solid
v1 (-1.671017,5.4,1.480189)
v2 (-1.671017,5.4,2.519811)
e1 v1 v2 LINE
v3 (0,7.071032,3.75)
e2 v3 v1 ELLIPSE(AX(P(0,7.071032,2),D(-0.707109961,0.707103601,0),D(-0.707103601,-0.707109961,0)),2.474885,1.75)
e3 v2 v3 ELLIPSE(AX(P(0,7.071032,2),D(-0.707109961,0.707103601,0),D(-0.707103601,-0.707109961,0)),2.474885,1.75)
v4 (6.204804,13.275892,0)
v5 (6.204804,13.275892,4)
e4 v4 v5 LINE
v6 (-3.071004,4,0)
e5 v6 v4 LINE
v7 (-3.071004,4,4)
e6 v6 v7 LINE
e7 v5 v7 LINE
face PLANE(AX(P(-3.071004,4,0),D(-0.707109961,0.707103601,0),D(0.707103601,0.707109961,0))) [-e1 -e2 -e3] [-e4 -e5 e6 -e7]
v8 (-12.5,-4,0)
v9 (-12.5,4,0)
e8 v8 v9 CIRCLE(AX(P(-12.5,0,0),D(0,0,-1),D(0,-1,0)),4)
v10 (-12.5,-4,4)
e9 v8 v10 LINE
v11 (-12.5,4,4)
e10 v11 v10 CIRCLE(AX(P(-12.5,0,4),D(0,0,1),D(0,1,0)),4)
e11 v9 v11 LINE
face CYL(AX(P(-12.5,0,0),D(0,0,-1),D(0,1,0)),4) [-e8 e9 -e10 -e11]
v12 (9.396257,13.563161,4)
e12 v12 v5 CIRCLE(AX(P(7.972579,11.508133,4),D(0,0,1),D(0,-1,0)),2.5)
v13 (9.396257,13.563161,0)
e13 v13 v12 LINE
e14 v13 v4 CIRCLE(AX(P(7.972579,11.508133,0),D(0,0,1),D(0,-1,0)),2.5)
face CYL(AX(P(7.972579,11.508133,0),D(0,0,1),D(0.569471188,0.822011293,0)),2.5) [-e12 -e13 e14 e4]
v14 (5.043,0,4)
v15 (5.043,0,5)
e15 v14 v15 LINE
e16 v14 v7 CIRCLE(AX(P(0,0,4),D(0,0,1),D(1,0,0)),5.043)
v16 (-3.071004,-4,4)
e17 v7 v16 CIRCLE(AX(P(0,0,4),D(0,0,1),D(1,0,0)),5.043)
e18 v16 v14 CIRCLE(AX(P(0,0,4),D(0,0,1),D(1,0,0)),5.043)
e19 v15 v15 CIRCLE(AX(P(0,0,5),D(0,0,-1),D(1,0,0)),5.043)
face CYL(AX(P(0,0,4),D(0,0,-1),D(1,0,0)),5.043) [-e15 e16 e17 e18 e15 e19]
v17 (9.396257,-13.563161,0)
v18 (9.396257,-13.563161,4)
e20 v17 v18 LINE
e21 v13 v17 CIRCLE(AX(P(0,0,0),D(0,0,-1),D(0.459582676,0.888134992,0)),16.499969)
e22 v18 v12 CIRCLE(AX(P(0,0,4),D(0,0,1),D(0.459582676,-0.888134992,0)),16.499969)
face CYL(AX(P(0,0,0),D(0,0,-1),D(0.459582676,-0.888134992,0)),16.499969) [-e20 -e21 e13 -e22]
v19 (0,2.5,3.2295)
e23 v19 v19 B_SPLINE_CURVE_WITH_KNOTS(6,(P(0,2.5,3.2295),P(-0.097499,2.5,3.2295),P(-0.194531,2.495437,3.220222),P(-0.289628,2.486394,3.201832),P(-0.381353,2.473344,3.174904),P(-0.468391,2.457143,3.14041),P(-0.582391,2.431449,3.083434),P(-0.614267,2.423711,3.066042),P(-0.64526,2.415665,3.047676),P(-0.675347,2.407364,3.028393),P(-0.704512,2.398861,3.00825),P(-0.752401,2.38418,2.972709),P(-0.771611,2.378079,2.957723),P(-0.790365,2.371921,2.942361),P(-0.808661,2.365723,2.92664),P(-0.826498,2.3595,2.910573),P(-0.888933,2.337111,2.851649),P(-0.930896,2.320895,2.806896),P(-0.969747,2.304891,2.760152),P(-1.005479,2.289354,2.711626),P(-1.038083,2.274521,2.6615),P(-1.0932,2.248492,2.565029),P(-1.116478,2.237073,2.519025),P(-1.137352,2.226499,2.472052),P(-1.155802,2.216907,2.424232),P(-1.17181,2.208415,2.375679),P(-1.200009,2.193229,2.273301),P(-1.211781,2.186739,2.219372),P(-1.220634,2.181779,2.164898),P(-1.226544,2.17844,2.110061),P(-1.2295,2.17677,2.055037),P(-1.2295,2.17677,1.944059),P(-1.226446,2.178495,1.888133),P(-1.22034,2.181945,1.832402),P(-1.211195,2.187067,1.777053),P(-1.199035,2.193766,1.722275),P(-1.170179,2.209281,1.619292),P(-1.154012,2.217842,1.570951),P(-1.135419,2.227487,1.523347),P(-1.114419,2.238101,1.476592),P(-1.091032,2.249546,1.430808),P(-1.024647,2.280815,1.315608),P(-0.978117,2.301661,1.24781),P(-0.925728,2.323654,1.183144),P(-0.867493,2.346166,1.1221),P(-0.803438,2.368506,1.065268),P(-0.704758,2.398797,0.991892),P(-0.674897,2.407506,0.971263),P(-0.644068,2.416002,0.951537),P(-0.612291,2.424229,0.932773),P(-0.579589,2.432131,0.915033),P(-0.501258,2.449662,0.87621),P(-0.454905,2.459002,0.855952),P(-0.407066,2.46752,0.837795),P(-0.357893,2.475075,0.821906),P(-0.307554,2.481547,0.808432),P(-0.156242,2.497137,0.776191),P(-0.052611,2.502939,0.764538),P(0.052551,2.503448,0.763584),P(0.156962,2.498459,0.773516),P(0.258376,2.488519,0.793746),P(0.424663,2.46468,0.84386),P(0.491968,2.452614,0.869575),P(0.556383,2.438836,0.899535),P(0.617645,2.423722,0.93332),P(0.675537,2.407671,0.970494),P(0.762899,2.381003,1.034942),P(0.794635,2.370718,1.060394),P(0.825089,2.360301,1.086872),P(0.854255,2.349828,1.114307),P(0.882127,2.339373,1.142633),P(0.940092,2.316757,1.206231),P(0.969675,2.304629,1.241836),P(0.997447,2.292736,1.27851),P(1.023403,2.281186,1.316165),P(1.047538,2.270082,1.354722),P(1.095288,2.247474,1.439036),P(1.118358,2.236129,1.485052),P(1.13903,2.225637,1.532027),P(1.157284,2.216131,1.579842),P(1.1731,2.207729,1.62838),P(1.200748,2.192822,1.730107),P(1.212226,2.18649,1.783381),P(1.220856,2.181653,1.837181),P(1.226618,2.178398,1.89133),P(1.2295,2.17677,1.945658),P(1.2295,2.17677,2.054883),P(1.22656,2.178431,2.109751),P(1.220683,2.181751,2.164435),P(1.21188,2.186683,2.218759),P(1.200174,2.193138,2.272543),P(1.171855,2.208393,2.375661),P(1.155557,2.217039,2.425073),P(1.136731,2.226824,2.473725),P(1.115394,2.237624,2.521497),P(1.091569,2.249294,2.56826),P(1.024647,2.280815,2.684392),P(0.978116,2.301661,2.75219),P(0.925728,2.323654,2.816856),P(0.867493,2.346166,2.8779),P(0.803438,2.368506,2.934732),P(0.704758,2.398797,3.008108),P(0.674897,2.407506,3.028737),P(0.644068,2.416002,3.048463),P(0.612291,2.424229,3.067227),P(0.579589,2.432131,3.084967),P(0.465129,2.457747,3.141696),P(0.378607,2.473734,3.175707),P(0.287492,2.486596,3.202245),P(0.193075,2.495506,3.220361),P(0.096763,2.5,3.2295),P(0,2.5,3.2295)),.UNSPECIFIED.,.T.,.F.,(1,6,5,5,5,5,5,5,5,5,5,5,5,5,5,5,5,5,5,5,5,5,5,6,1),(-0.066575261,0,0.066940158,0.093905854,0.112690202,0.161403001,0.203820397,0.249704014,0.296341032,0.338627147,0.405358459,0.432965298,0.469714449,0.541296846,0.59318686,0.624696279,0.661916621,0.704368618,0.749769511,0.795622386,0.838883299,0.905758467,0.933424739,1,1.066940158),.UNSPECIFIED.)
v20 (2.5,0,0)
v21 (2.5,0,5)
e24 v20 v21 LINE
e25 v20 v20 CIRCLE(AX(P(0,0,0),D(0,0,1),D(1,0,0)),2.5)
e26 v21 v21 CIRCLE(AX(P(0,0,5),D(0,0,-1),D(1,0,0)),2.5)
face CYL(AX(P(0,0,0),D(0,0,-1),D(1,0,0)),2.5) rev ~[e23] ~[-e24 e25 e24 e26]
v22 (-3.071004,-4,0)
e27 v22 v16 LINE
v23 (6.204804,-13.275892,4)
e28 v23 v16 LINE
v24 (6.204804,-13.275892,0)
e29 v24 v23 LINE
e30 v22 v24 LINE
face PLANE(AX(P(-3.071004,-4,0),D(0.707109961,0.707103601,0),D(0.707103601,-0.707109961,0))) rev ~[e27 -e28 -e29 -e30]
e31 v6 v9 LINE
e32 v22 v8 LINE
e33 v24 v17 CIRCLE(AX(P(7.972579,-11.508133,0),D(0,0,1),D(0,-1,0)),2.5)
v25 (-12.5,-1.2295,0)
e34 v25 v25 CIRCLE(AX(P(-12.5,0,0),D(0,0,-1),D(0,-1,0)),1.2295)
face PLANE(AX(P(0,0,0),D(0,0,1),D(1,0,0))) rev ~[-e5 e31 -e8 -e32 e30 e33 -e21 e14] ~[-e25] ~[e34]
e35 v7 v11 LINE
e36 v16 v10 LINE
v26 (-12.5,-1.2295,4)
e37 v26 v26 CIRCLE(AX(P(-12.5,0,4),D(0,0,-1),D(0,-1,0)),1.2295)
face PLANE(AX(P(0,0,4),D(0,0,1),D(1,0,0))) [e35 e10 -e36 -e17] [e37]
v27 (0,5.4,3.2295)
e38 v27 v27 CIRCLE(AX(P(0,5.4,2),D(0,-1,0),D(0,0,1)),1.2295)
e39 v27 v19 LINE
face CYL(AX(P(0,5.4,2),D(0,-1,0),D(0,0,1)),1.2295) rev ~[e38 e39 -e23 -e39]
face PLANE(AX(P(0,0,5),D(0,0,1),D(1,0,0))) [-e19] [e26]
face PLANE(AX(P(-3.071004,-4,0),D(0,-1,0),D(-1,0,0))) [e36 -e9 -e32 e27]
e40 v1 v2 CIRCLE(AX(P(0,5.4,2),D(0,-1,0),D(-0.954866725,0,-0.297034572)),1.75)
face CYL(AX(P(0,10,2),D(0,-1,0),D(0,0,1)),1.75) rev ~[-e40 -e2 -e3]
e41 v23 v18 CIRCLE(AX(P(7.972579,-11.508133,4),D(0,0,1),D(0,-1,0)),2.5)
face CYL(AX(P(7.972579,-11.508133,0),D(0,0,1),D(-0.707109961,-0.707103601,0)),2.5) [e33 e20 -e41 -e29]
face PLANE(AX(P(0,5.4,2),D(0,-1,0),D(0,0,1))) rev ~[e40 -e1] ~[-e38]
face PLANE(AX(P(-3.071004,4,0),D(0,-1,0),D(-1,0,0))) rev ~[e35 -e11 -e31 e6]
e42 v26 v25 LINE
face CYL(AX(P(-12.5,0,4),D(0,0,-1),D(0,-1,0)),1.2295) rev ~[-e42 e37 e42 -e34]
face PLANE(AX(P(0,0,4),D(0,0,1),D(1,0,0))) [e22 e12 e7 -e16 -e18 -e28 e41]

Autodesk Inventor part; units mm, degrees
ref_plane "YZ Plane" through (0, 0, 0) normal (1, 0, 0) x (0, 1, 0)
ref_plane "XZ Plane" through (0, 0, 0) normal (0, 1, 0) x (-1, 0, 0)
sketch "Skizze1" plane through (0, 0, 0) normal (0, 0, 1) x (1, 0, 0)
  line L0 (0, -20.5159) -> (0, 20.5159) projected
  line L1 (-23.1, 0) -> (23.1, 0) projected
  circle A0 centre (0, 0) radius 2.5
  arc A1 (-3, 4) -> (-3, -4) centre (0, 0) ccw
  arc A2 (7.5831, -14.6542) -> (7.5831, 14.6542) centre (0, 0) ccw
  line L2 (-3.5355, 3.5355) -> (7.5831, 14.6542)
  line L3 (-3.5355, -3.5355) -> (7.5831, -14.6542)
  line L4 (-3, 4) -> (-12.5, 4)
  line L5 (-3, -4) -> (-12.5, -4)
  arc A3 (-12.5, 4) -> (-12.5, -4) centre (-12.5, 0) ccw
  dimension "d0" = 5
  dimension "d1" = 10
  dimension "d3" = 33
  dimension "d4" = 90
  dimension "d5" = 4
  dimension "d6" = 12.5
extrude "Extrusion1" add sketch "Skizze1" along normal blind 4 contours L3 L5 A1 L1 A0 L0 | L0 A0 L1 A2 L3 | L5 A3 L1 A1 L3 | L3 A1 L5 | L1 A1 L4 L2 L0 A0 | A0 L0 L2 A2 L1 | L1 A3 L4 L2 A1 | L2 L4 A1
fillet "Rundung1" radius 2.5 2 edges at (7.5831, 14.6542, 2) (7.5831, -14.6542, 2)
sketch "Skizze2" plane through (0, 0, 4) normal (0, 0, 1) x (1, 0, 0)
  arc A0 (-12.5, 4) -> (-12.5, -4) centre (-12.5, 0) ccw projected
  point P0 (0, 0)
hole "Bohrung1" at (-12.5, 0, 4) direction (0, 0, -1) diameter 2.459 end through all thread size "M3x0.5" class "6H" standard "ISO Metric profile"
sketch "Skizze3" plane through (0, 0, 4) normal (0, 0, 1) x (1, 0, 0)
  line L0 (0, -19.6114) -> (0, 19.6114) projected
  line L1 (-23.1, 0) -> (23.1, 0) projected
  line L2 (-12.5, -4) -> (-3.0711, -4) projected
  circle A0 centre (0, 0) radius 5.043
  circle A1 centre (0, 0) radius 2.5
  dimension "d17" = 5
extrude "Extrusion2" add sketch "Skizze3" along normal blind 1 contours A0 L1 A1 L0 | L0 A1 L1 A0 | L1 A1 L0 A0 | L1 A0 L0 A1
ref_plane "Arbeitsebene1" through (0, 10, 0) normal (0, 1, 0) x (-1, 0, 0)
sketch "Skizze7" plane through (0, 10, 0) normal (0, 1, 0) x (-1, 0, 0)
  line L0 (0, -1) -> (0, 6) projected
  line L1 (23.1, 0) -> (-23.1, 0) projected
  line L2 (12.5, 0) -> (12.5, 4) projected
  point P0 (0, 0)
  point P1 (0, 2)
  dimension "d30" = 2
hole "Bohrung3" at (0, 10, 2) direction (0, -1, 0) diameter 3.5 depth 4.6
sketch "Skizze8" plane through (0, 5.4, 2) normal (0, 1, 0) x (1, 0, 0)
  line L0 (0, 3) -> (0, -4) projected
  line L1 (23.1, 2) -> (-23.1, 2) projected
  point P0 (0, 2)
  point P1 (0, 0)
  dimension "d38" = 2
hole "Bohrung4" at (0, 5.4, 2) direction (0, -1, 0) diameter 2.459 end up to surface thread size "M3x0.5" class "6H" standard "ISO Metric profile"
properties part number "Kurbel 20"
